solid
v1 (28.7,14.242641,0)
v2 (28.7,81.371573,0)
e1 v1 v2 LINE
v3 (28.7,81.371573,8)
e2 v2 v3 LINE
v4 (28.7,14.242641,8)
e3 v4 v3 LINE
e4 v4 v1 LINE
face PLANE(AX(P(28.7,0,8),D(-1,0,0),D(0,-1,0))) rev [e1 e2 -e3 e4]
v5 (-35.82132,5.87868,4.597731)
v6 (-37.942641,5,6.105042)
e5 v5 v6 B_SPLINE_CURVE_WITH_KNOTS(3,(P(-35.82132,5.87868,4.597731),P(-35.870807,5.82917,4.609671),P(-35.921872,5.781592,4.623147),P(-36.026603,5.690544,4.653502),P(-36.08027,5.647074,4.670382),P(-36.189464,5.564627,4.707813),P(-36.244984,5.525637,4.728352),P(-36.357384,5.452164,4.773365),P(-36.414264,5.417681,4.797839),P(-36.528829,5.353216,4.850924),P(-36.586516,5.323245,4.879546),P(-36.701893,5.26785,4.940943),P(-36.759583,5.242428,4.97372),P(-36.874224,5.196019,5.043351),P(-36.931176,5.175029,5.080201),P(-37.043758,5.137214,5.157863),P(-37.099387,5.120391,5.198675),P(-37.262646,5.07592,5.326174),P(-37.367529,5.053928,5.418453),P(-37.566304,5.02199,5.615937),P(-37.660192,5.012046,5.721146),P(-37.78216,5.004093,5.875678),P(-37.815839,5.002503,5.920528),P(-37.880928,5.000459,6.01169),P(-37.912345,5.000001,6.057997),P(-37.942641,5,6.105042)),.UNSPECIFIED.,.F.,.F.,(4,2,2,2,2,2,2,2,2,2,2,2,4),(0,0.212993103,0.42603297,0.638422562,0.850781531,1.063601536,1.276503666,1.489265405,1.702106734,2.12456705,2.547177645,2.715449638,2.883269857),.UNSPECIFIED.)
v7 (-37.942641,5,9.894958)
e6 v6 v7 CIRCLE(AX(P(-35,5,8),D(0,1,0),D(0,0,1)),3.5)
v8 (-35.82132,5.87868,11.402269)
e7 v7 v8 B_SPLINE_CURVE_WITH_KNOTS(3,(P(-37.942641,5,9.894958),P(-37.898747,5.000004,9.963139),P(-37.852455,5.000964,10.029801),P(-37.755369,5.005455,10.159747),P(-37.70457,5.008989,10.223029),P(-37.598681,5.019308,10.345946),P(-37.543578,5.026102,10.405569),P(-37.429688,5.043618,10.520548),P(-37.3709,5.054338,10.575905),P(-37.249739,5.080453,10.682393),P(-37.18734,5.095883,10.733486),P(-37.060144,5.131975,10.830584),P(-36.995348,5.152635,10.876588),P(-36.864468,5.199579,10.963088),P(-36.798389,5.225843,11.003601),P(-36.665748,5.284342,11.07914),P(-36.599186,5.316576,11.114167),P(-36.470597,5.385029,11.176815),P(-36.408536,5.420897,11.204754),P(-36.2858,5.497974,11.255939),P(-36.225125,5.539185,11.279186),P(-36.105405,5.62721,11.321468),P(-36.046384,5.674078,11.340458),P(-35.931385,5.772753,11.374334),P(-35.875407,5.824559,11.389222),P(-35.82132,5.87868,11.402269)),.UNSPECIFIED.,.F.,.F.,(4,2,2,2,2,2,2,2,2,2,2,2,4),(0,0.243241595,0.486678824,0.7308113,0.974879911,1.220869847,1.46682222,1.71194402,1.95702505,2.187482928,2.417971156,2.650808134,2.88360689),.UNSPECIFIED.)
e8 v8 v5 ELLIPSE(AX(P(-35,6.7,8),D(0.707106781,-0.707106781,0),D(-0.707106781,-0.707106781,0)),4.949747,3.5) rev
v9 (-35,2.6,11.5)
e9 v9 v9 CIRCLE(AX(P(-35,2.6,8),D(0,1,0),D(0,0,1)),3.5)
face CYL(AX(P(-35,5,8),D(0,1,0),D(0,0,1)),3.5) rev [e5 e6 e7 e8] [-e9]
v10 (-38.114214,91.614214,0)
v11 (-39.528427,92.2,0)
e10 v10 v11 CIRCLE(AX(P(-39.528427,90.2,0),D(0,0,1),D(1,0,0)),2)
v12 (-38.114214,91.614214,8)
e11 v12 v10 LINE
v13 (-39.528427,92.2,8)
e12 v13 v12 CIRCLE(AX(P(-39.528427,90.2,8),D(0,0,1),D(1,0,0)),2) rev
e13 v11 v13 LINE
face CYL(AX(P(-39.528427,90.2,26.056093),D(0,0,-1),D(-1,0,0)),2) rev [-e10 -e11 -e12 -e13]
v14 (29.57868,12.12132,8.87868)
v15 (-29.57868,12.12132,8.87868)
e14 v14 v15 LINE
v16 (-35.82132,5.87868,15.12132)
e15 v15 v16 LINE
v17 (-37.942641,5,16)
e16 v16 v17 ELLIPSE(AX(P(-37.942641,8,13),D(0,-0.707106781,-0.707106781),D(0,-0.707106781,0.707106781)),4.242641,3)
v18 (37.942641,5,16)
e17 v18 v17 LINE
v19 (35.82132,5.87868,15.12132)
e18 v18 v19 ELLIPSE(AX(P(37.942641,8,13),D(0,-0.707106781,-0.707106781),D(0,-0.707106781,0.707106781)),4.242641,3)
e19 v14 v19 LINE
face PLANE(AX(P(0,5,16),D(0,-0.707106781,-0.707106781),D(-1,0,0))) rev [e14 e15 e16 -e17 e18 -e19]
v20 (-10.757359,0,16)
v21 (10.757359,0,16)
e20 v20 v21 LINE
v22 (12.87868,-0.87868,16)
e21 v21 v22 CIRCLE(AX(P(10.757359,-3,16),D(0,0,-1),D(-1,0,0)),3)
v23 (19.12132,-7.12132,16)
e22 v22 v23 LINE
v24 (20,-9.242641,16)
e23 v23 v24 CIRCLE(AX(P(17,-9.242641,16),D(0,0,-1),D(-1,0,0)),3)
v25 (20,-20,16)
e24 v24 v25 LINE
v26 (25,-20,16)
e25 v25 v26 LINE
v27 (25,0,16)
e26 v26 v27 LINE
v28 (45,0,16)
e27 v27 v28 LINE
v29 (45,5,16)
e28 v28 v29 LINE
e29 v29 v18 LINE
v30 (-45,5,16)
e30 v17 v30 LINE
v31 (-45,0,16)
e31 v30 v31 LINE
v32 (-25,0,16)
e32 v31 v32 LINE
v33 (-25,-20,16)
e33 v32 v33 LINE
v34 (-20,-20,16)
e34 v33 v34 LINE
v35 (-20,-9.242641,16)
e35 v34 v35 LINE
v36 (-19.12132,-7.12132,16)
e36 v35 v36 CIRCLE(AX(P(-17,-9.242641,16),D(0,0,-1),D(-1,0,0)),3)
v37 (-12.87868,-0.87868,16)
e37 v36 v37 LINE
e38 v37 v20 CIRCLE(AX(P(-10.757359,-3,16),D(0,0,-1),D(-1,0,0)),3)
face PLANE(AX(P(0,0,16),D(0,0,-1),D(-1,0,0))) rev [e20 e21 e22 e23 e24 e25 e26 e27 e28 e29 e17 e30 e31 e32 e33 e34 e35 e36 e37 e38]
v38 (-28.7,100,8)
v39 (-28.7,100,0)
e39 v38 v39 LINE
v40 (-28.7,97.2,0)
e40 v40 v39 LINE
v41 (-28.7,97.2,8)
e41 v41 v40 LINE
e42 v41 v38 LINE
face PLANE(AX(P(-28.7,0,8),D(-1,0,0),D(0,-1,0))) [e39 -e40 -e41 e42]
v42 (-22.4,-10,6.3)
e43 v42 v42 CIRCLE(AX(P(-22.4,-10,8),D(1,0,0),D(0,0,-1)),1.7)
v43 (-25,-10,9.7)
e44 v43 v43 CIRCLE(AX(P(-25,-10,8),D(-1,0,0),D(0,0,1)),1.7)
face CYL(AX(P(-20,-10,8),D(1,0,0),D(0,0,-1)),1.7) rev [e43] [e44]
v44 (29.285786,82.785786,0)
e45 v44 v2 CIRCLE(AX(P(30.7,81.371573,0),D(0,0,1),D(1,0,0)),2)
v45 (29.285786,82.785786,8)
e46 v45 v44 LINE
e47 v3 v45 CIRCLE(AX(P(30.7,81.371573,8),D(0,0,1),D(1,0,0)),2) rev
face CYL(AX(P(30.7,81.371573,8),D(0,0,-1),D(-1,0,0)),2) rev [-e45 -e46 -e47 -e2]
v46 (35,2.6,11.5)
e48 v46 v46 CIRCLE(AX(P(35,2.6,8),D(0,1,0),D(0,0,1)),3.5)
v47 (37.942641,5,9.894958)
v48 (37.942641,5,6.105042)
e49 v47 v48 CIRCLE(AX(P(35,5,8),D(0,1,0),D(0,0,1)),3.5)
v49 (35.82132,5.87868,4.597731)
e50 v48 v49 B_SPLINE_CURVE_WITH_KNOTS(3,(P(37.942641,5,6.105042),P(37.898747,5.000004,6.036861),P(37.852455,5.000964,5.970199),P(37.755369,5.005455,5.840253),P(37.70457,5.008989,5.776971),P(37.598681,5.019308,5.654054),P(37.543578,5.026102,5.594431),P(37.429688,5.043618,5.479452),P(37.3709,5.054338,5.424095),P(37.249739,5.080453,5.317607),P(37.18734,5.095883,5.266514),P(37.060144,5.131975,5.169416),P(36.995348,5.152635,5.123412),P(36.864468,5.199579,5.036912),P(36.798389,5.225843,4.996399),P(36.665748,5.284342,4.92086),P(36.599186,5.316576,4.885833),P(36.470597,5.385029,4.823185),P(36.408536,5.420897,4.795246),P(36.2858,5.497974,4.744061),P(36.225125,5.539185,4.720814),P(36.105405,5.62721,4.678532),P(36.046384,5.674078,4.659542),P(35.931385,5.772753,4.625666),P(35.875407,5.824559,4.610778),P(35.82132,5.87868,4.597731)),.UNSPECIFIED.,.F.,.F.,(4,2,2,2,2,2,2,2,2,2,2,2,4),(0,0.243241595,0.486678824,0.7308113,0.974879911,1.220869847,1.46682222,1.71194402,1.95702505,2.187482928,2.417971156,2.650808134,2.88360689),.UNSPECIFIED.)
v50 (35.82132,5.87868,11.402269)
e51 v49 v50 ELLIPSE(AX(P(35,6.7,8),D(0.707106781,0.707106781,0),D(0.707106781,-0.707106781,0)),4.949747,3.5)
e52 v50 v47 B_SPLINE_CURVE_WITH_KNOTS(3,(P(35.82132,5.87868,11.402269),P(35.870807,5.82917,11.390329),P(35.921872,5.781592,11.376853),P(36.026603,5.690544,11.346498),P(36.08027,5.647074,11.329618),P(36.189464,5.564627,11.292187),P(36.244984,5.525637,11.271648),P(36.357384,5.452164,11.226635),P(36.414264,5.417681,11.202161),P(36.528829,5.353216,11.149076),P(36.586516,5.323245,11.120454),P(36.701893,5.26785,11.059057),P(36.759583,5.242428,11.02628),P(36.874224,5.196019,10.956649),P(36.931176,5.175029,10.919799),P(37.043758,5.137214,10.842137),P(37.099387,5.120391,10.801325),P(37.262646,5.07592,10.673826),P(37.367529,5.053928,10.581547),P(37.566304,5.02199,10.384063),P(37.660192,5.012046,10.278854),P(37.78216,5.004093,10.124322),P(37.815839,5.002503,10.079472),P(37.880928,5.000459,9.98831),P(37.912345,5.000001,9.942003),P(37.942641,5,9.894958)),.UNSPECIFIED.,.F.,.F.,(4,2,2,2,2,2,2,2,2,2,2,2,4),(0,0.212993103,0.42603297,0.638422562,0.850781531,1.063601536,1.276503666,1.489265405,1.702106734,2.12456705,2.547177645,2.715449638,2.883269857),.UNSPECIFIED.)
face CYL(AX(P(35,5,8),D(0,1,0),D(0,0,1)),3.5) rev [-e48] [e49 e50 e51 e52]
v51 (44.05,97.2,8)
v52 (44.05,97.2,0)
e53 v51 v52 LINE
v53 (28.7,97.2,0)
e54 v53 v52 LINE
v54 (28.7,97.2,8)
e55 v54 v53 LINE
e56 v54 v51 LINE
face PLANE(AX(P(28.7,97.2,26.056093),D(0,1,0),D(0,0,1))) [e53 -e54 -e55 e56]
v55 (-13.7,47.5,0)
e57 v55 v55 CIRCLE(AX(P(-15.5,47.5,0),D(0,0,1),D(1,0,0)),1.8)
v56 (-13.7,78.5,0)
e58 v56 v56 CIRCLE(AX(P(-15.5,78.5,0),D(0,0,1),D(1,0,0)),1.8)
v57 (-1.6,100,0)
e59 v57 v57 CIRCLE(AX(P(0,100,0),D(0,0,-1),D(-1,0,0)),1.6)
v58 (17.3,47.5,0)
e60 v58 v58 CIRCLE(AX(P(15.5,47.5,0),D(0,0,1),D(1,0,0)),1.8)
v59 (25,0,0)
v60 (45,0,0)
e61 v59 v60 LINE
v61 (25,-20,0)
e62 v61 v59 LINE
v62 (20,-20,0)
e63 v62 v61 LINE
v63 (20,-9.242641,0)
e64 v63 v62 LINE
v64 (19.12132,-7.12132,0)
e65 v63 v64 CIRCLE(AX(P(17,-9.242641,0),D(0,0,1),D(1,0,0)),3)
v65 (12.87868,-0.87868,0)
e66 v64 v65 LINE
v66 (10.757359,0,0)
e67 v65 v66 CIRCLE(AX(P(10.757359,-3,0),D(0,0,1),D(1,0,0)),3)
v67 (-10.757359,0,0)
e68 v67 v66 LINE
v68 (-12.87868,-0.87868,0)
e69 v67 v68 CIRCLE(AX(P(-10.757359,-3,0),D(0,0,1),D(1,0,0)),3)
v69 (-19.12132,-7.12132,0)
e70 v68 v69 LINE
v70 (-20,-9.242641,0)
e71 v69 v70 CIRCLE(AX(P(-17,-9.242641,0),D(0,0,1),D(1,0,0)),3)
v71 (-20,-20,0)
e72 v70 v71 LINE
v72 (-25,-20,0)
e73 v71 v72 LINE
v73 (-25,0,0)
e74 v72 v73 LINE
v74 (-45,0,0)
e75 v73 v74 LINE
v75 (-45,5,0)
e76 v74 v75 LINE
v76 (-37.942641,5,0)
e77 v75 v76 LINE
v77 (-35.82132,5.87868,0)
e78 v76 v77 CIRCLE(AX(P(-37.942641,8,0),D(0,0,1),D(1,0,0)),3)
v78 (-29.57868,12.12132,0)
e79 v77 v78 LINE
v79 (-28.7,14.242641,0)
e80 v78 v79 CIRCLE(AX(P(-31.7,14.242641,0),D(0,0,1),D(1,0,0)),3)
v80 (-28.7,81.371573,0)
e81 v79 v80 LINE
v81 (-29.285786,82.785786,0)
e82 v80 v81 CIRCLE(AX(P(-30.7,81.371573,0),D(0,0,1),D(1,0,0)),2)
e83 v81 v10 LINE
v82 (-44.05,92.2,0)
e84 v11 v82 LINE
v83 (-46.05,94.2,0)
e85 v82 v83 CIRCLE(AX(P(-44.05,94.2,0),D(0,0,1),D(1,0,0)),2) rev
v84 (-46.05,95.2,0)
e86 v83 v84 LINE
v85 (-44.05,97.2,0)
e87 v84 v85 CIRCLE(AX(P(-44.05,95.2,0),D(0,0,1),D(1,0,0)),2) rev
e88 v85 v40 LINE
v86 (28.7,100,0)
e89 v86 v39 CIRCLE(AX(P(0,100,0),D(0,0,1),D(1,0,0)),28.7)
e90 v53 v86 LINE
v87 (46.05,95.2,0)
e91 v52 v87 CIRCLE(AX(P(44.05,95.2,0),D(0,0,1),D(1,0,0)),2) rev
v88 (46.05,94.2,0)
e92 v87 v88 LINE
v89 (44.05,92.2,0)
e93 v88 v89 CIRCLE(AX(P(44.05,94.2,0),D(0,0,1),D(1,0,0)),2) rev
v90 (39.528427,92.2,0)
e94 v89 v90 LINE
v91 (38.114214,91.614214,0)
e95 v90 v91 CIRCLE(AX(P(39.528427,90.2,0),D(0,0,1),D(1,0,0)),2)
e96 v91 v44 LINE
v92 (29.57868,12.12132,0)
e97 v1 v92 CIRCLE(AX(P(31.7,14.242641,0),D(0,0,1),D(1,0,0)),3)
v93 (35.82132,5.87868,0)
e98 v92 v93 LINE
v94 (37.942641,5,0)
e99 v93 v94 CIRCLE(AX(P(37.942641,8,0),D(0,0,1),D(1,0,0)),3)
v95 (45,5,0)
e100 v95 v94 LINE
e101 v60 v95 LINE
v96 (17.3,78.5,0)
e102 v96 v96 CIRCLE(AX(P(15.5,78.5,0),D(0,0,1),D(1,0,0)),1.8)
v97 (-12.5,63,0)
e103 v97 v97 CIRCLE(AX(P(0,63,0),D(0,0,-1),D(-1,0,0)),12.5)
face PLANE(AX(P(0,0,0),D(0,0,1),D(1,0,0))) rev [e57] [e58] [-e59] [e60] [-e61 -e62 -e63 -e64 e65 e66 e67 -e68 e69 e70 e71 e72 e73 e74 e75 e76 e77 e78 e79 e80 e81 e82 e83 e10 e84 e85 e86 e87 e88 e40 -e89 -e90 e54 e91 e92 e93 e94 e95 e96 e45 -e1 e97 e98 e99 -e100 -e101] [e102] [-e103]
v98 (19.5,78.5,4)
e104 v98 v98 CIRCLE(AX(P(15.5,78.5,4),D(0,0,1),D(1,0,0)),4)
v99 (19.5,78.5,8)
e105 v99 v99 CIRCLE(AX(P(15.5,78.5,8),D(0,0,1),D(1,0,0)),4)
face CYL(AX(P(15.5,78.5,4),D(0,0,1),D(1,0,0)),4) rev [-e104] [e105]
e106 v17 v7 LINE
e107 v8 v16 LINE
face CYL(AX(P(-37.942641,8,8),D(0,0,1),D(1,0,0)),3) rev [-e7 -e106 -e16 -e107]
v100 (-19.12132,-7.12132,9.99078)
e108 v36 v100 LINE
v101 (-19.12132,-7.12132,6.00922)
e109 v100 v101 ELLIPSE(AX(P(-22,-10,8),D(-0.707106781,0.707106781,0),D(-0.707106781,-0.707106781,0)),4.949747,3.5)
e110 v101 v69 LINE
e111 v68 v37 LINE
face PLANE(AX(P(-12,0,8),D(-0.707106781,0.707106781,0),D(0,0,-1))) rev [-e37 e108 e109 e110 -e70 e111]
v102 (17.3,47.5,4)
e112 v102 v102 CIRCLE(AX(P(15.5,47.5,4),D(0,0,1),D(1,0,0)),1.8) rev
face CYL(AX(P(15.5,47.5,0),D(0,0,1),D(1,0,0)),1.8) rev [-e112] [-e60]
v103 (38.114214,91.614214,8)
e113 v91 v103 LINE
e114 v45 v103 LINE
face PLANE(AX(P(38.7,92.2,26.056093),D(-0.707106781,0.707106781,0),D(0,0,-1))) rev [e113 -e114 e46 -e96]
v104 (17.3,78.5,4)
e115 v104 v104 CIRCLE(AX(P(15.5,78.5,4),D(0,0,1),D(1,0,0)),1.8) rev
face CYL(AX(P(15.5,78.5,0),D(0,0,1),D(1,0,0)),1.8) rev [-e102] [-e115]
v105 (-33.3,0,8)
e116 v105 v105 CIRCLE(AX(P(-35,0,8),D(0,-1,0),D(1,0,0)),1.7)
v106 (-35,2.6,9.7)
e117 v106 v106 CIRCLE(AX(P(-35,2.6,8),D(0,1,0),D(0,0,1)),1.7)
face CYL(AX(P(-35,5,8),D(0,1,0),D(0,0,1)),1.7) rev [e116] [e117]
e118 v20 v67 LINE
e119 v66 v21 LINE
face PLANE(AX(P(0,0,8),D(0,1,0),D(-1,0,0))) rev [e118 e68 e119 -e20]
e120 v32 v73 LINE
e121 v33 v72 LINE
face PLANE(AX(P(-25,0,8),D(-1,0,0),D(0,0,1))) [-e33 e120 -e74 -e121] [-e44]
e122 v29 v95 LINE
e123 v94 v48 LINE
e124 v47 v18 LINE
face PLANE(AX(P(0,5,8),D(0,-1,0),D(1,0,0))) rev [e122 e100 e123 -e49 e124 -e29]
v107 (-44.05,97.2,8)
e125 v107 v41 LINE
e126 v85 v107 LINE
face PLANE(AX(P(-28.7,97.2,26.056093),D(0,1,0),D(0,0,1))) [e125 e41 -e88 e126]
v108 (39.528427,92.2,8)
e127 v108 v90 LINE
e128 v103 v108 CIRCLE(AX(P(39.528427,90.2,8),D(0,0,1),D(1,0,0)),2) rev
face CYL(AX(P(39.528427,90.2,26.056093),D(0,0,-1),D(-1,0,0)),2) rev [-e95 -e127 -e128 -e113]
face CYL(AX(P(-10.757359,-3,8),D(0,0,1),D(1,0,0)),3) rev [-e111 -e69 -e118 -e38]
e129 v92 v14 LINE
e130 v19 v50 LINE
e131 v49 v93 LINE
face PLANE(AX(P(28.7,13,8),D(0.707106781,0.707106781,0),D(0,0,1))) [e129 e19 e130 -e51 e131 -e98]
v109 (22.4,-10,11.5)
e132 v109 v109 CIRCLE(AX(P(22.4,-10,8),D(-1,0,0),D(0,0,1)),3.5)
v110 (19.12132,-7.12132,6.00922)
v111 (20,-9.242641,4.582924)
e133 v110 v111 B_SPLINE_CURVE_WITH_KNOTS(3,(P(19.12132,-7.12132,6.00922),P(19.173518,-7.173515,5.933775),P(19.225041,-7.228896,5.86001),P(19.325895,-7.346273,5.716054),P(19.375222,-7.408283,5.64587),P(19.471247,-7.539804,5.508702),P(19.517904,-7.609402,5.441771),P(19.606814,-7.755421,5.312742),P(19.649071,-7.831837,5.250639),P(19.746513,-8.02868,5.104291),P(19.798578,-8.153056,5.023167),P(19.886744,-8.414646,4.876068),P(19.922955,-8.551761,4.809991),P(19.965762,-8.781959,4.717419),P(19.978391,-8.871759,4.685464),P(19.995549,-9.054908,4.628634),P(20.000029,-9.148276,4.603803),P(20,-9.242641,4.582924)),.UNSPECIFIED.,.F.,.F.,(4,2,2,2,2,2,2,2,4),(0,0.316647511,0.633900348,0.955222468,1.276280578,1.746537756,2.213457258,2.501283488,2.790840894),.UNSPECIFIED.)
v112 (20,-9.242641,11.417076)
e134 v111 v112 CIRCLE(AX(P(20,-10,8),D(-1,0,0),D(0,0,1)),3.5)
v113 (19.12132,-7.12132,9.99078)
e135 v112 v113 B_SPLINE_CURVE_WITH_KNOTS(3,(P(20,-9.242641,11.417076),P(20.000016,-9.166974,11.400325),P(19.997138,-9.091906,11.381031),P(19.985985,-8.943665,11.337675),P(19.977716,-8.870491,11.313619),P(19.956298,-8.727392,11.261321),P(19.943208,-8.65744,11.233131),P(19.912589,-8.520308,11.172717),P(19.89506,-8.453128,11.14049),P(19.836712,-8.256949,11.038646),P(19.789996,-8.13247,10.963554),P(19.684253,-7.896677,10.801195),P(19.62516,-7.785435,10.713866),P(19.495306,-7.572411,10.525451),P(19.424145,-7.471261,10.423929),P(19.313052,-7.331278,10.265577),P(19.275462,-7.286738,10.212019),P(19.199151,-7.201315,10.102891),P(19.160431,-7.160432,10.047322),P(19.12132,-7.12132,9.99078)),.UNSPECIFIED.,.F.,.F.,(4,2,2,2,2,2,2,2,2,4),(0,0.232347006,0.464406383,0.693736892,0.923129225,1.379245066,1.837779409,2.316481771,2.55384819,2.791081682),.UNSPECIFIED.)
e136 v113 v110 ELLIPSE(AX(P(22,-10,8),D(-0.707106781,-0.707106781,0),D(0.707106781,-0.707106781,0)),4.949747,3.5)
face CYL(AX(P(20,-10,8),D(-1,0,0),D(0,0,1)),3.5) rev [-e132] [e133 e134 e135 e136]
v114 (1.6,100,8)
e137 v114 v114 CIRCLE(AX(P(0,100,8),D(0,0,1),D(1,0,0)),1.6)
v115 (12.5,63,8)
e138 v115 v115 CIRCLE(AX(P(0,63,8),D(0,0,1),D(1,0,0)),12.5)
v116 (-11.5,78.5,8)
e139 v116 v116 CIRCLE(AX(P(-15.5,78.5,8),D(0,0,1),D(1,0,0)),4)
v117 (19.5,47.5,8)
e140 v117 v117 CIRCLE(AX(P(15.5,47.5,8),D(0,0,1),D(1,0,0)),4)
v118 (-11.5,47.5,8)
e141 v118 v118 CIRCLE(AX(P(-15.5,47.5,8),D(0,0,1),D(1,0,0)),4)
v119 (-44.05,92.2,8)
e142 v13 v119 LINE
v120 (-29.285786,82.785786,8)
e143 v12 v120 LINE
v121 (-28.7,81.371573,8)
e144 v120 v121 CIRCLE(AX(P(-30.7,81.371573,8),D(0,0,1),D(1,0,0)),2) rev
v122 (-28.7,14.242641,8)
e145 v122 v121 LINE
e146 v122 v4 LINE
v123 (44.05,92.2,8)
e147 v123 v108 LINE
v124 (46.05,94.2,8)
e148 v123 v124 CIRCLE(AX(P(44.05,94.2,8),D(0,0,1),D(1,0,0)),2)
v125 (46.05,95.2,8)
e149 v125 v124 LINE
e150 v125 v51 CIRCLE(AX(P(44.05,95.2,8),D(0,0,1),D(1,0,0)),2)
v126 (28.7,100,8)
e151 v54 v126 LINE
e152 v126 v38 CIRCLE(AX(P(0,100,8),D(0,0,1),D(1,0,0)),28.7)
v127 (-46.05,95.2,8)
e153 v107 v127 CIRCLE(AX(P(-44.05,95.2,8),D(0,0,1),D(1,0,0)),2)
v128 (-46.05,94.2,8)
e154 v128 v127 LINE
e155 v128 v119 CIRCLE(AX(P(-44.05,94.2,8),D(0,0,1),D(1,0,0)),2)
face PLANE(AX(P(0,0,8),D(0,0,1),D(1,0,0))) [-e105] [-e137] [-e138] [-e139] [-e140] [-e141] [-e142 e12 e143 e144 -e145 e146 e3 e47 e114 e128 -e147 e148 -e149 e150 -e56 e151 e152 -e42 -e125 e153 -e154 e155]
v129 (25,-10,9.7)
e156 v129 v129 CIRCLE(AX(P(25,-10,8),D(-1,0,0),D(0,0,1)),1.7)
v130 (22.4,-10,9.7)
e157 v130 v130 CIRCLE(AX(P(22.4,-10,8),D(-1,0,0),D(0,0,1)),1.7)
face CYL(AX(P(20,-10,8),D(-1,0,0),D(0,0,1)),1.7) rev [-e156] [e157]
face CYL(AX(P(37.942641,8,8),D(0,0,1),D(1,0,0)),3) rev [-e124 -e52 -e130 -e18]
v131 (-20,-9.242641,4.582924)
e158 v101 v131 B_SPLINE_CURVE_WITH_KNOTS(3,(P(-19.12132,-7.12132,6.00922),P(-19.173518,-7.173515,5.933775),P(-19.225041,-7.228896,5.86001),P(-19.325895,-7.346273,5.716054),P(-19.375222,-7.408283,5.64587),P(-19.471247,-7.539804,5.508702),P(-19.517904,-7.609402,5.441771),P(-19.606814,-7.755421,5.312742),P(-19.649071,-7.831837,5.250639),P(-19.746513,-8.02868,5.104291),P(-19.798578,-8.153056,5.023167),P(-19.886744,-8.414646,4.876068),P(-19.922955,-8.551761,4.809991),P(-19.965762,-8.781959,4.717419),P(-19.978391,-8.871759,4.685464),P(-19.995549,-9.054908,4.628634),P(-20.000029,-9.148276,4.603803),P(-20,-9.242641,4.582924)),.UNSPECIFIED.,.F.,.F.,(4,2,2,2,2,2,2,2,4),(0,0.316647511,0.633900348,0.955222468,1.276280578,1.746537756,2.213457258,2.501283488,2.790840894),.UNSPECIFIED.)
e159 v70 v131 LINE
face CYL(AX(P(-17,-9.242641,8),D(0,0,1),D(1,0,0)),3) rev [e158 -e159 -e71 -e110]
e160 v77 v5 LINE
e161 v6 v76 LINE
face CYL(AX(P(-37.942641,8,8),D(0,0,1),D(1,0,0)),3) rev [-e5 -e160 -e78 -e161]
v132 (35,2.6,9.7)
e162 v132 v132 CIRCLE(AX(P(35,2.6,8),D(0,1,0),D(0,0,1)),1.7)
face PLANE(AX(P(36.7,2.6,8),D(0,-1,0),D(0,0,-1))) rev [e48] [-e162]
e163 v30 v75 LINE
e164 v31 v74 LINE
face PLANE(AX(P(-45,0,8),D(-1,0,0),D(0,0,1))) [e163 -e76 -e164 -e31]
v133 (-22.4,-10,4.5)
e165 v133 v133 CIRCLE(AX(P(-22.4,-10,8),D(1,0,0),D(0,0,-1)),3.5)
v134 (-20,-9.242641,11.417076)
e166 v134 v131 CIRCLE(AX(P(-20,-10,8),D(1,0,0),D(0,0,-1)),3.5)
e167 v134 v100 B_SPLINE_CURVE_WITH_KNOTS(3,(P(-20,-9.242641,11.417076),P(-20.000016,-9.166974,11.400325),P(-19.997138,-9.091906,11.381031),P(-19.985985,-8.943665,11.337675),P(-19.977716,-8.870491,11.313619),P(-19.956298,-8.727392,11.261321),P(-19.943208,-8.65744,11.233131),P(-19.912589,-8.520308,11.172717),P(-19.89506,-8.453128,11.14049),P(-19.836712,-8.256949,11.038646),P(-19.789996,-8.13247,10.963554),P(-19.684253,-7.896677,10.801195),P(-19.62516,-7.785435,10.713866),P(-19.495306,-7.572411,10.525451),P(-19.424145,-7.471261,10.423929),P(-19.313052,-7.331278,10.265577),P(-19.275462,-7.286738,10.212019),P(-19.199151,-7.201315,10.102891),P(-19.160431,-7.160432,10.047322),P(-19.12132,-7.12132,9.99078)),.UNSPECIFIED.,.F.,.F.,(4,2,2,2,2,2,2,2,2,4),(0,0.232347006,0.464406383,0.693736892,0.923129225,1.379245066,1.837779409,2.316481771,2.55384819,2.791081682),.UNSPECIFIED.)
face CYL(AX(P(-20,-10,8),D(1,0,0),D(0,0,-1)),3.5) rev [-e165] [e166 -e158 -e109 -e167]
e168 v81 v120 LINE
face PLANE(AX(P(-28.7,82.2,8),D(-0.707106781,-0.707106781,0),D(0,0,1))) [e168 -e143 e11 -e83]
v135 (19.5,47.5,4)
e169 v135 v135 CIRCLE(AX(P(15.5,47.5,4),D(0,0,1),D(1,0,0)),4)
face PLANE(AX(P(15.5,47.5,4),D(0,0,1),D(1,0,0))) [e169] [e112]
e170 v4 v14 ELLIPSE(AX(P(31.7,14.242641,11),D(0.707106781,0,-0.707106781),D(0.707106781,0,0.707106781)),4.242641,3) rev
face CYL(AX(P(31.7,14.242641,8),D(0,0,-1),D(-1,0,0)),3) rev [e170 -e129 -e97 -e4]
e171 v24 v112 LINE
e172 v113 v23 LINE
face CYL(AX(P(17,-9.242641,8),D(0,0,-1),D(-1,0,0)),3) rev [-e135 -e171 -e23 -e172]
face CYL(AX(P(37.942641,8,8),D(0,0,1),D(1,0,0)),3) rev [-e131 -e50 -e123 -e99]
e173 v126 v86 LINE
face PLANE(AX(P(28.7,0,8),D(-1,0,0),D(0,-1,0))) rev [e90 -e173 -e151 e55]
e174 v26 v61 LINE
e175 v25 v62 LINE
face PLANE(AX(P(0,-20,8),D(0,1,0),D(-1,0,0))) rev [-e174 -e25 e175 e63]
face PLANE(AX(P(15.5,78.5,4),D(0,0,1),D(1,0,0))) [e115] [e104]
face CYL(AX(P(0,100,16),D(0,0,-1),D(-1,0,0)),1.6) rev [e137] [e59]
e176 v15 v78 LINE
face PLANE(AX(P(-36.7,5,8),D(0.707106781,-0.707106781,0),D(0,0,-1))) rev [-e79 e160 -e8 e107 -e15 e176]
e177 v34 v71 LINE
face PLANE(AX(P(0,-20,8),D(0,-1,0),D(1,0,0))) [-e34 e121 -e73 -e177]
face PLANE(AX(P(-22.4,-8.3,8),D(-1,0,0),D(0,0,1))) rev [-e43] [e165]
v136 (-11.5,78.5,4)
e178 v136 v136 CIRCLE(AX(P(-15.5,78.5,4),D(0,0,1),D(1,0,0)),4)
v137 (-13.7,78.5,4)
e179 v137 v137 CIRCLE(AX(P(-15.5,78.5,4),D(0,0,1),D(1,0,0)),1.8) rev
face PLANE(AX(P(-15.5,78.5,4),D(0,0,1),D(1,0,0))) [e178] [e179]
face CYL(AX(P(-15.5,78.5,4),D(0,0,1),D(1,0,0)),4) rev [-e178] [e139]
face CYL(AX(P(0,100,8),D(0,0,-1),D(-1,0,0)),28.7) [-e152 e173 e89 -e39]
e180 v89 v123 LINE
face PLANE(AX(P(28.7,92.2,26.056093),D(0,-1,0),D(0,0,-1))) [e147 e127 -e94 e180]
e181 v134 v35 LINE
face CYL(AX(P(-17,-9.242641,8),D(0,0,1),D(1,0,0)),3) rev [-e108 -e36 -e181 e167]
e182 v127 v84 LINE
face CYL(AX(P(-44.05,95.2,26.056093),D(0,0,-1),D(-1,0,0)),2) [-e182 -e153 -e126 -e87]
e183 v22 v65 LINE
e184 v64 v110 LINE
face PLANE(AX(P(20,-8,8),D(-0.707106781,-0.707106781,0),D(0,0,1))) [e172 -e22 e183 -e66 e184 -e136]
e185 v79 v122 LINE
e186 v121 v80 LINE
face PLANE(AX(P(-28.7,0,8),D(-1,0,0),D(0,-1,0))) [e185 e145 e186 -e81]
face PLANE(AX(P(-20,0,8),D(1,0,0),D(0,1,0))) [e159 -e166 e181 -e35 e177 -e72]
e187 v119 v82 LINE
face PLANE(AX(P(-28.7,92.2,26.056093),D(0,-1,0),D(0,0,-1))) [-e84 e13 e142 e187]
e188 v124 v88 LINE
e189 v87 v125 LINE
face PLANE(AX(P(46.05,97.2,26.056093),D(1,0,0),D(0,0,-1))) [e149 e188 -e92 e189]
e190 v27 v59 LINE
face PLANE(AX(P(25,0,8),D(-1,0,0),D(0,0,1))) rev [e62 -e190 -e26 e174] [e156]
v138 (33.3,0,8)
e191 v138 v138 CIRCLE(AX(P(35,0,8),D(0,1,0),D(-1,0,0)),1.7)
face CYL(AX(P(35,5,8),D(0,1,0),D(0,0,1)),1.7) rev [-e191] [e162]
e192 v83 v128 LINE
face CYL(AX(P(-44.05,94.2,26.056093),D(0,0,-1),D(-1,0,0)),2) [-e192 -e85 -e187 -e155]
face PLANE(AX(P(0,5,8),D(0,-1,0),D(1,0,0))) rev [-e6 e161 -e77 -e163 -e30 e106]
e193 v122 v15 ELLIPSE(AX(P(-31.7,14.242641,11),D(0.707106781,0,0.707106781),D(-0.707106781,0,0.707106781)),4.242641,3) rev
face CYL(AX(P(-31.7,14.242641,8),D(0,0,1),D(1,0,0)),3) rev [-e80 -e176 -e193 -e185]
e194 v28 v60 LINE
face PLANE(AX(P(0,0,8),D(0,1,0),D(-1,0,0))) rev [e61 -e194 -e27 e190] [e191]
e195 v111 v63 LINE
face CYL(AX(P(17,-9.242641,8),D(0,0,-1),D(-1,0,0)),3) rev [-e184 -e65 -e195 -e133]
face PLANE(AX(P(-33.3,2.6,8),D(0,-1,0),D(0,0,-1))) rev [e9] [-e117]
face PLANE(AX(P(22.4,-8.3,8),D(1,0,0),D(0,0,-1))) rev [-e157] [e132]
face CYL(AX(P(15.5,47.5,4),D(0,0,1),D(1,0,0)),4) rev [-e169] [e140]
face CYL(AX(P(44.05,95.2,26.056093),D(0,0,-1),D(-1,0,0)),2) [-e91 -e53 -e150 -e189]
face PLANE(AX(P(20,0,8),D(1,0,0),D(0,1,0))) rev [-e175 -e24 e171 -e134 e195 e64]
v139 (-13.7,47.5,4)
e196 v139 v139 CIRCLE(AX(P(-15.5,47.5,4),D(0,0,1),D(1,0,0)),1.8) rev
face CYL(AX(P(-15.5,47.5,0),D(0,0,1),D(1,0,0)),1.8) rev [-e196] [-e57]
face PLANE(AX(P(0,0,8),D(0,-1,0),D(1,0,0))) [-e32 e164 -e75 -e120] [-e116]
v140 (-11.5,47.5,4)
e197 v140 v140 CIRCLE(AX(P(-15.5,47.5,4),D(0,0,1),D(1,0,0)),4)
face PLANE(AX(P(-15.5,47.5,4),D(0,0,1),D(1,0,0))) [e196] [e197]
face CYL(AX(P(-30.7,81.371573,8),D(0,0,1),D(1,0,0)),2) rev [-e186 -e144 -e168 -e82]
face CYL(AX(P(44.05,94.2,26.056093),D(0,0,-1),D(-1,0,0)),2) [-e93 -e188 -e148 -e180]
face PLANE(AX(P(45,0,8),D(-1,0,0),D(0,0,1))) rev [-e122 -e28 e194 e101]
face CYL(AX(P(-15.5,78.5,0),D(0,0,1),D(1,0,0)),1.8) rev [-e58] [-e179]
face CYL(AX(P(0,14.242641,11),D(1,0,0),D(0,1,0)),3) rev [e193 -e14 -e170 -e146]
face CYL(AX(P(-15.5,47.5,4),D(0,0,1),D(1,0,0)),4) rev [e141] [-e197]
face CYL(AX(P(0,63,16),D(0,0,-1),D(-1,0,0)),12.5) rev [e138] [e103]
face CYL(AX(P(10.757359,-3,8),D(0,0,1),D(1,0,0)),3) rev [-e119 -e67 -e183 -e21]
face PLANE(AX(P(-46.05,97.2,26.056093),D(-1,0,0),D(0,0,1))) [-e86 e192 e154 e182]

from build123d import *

# Parameters (mm, degrees)
RESSALTO_EXTRUS_O1_DEPTH                     = 8
RESSALTO_EXTRUS_O2_DEPTH                     = 8
CHANFRO1_SIZE                                = 8
ESBO_O3_R                                    = 1.6
ESBO_O3_R_2                                  = 12.5
CORTE_EXTRUS_O1_DEPTH                        = 138.275962936
FILETE1_R                                    = 3
REBAIXO_PARA_PARAFUSO_COM_CABE_A_PAN_2_COUNT = 2
REBAIXO_PARA_PARAFUSO_COM_CABE_A_PAN_2_PITCH = 70
CORTE_EXTRUS_O3_START                        = 10
ESBO_O13_R                                   = 3.5
CORTE_EXTRUS_O3_DEPTH                        = 10
ESBO_O18_R                                   = 3.5
CORTE_EXTRUS_O4_DEPTH                        = 2
ESBO_O19_R                                   = 1.8
CORTE_EXTRUS_O5_DEPTH                        = 137.574851278
ESBO_O20_R                                   = 4
CORTE_EXTRUS_O6_DEPTH                        = 4
ESBO_O21_W                                   = 17.35
ESBO_O21_H                                   = 5
RESSALTO_EXTRUS_O3_DEPTH                     = 8
FILETE2_R                                    = 2
CHANFRO2_SIZE                                = 10
FILETE3_R                                    = 2


with BuildPart() as part:
    # Esboço1 → Ressalto-extrusão1 (new body)
    with BuildSketch(Plane.XY):
        with BuildLine():
            Line((28.7, 5), (28.7, 100))
            ThreePointArc((28.7, 100), (0, 128.7), (-28.7, 100))
            Line((-28.7, 100), (-28.7, 5))
            Line((-28.7, 5), (-45, 5))
            Line((-45, 5), (-45, 0))
            Line((-45, 0), (-25, 0))
            Line((-25, 0), (-25, -20))
            Line((-25, -20), (-20, -20))
            Line((-20, -20), (-20, 0))
            Line((-20, 0), (20, 0))
            Line((20, 0), (20, -20))
            Line((20, -20), (25, -20))
            Line((25, -20), (25, 0))
            Line((25, 0), (45, 0))
            Line((45, 0), (45, 5))
            Line((45, 5), (28.7, 5))
        make_face()
    extrude(amount=RESSALTO_EXTRUS_O1_DEPTH)

    # Esboço2 → Ressalto-extrusão2 (add)
    with BuildSketch(Plane.XY.offset(8)):
        Polygon((-20, -20), (-25, -20), (-25, 0), (-45, 0), (-45, 5), (45, 5), (45, 0), (25, 0), (25, -20), (20, -20), (20, 0), (-20, 0), align=None)
    extrude(amount=RESSALTO_EXTRUS_O2_DEPTH)

    # Chanfro1
    chanfro1_edges = [part.edges().sort_by_distance(p)[0] for p in [
        (28.7, 5, 4),
        (20, 0, 8),
        (-20, 0, 8),
        (-28.7, 5, 4),
        (0, 5, 8),
    ]]
    chamfer(chanfro1_edges, length=CHANFRO1_SIZE - 0.0001)  # a hair under: the kernel refuses the full size

    # Esboço3 → Corte-extrusão1 (cut, through all)
    with BuildSketch(Plane(origin=(0, 0, 0), x_dir=(-1, 0, 0), z_dir=(0, 0, -1))):
        with Locations((0, 100)):
            Circle(ESBO_O3_R)
        with Locations((0, 63)):
            Circle(ESBO_O3_R_2)
    extrude(amount=-CORTE_EXTRUS_O1_DEPTH, mode=Mode.SUBTRACT)

    # Filete1
    filete1_edges = [part.edges().sort_by_distance(p)[0] for p in [
        (28.7, 12.9999, 4),
        (-36.6999, 5, 7.99995),
        (36.6999, 5, 7.99995),
        (-28.7, 12.9999, 4),
        (0, 12.9999, 8),
        (20, -7.9999, 8),
        (-12.0001, 0, 8),
        (12.0001, 0, 8),
        (-20, -7.9999, 8),
    ]]
    fillet(filete1_edges, radius=FILETE1_R)

    # Esboço12 → Rebaixo para parafuso com cabe_a panela (revolve, cut)
    with BuildSketch(Plane(origin=(35, 5, 8), x_dir=(0, 0, 1), z_dir=(1, 0, 0))):
        Polygon((0, 0), (0, 7.021463052), (1.7, 6), (1.7, 2.4), (3.5, 2.4), (3.5, 0), align=None)
    rebaixo_para_parafuso_com_cabe_a_panela = revolve(axis=Axis((35, 11.35, 8), (0, -1, 0)), mode=Mode.SUBTRACT)

    # Rebaixo para parafuso com cabe_a pan 2: Rebaixo para parafuso com cabe_a panela ×2
    with Locations(*[(-i * REBAIXO_PARA_PARAFUSO_COM_CABE_A_PAN_2_PITCH, 0, 0) for i in range(1, REBAIXO_PARA_PARAFUSO_COM_CABE_A_PAN_2_COUNT)]):
        add(rebaixo_para_parafuso_com_cabe_a_panela, mode=Mode.SUBTRACT)

    # Esboço13 → Corte-extrusão3 (cut)
    with BuildSketch(Plane(origin=(0, 5, 0), x_dir=(1, 0, 0), z_dir=(0, 1, 0)).offset(CORTE_EXTRUS_O3_START)):
        with Locations(Location((-35, -8, 0), (0, 0, 270))):
            Circle(ESBO_O13_R)
        with Locations(Location((35, -8, 0), (0, 0, 270))):
            Circle(ESBO_O13_R)
    extrude(amount=-CORTE_EXTRUS_O3_DEPTH, mode=Mode.SUBTRACT)

    # Esboço15 → Rebaixo para parafuso com cabe_a pan 3 (revolve, cut)
    with BuildSketch(Plane(origin=(20, -10, 8), x_dir=(0, 0, 1), z_dir=(0, 1, 0))):
        Polygon((0, 0), (0, 7.021463052), (1.7, 6), (1.7, 2.4), (3.5, 2.4), (3.5, 0), align=None)
    revolve(axis=Axis((13.65, -10, 8), (1, 0, 0)), mode=Mode.SUBTRACT)

    # Esboço17 → Rebaixo para parafuso com cabe_a pan 4 (revolve, cut)
    with BuildSketch(Plane(origin=(-20, -10, 8), x_dir=(0, 0, -1), z_dir=(0, 1, 0))):
        Polygon((0, 0), (0, 7.021463052), (1.7, 6), (1.7, 2.4), (3.5, 2.4), (3.5, 0), align=None)
    revolve(axis=Axis((-13.65, -10, 8), (-1, 0, 0)), mode=Mode.SUBTRACT)

    # Esboço18 → Corte-extrusão4 (cut)
    with BuildSketch(Plane.ZY.offset(-20)):
        with Locations((8, -10)):
            Circle(ESBO_O18_R)
    corte_extrus_o4 = extrude(amount=CORTE_EXTRUS_O4_DEPTH, mode=Mode.SUBTRACT)

    # Espelhar1: Corte-extrusão4 across plane
    add(corte_extrus_o4.mirror(Plane(origin=(0, 0, 0), x_dir=(0, 0, 1), z_dir=(1, 0, 0))), mode=Mode.SUBTRACT)

    # Esboço19 → Corte-extrusão5 (cut, through all)
    with BuildSketch(Plane.XY.offset(8)):
        with Locations((15.5, 78.5)):
            Circle(ESBO_O19_R)
        with Locations((15.5, 47.5)):
            Circle(ESBO_O19_R)
        with Locations((-15.5, 47.5)):
            Circle(ESBO_O19_R)
        with Locations((-15.5, 78.5)):
            Circle(ESBO_O19_R)
    extrude(amount=-CORTE_EXTRUS_O5_DEPTH, mode=Mode.SUBTRACT)

    # Esboço20 → Corte-extrusão6 (cut)
    with BuildSketch(Plane.XY.offset(8)):
        with Locations((15.5, 78.5)):
            Circle(ESBO_O20_R)
        with Locations((15.5, 47.5)):
            Circle(ESBO_O20_R)
        with Locations((-15.5, 47.5)):
            Circle(ESBO_O20_R)
        with Locations((-15.5, 78.5)):
            Circle(ESBO_O20_R)
    extrude(amount=-CORTE_EXTRUS_O6_DEPTH, mode=Mode.SUBTRACT)

    # Esboço21 → Ressalto-extrusão3 (add)
    with BuildSketch(Plane(origin=(0, 0, 0), x_dir=(-1, 0, 0), z_dir=(0, 0, -1))):
        with Locations((-37.375, 94.7)):
            Rectangle(ESBO_O21_W, ESBO_O21_H)
        with Locations((37.375, 94.7)):
            Rectangle(ESBO_O21_W, ESBO_O21_H)
    extrude(amount=-RESSALTO_EXTRUS_O3_DEPTH)

    # Filete2
    filete2_edges = [part.edges().sort_by_distance(p)[0] for p in [
        (46.05, 97.2, 4),
        (46.05, 92.2, 4),
        (-46.05, 92.2, 4),
        (-46.05, 97.2, 4),
    ]]
    fillet(filete2_edges, radius=FILETE2_R)

    # Chanfro2
    chanfro2_edges = [part.edges().sort_by_distance(p)[0] for p in [
        (28.7, 92.2, 4),
        (-28.7, 92.2, 4),
    ]]
    chamfer(chanfro2_edges, length=CHANFRO2_SIZE)

    # Filete3
    filete3_edges = [part.edges().sort_by_distance(p)[0] for p in [
        (38.7, 92.2, 4),
        (28.7, 82.2, 4),
        (-28.7, 82.2, 4),
        (-38.7, 92.2, 4),
    ]]
    fillet(filete3_edges, radius=FILETE3_R)


solid = part.part
